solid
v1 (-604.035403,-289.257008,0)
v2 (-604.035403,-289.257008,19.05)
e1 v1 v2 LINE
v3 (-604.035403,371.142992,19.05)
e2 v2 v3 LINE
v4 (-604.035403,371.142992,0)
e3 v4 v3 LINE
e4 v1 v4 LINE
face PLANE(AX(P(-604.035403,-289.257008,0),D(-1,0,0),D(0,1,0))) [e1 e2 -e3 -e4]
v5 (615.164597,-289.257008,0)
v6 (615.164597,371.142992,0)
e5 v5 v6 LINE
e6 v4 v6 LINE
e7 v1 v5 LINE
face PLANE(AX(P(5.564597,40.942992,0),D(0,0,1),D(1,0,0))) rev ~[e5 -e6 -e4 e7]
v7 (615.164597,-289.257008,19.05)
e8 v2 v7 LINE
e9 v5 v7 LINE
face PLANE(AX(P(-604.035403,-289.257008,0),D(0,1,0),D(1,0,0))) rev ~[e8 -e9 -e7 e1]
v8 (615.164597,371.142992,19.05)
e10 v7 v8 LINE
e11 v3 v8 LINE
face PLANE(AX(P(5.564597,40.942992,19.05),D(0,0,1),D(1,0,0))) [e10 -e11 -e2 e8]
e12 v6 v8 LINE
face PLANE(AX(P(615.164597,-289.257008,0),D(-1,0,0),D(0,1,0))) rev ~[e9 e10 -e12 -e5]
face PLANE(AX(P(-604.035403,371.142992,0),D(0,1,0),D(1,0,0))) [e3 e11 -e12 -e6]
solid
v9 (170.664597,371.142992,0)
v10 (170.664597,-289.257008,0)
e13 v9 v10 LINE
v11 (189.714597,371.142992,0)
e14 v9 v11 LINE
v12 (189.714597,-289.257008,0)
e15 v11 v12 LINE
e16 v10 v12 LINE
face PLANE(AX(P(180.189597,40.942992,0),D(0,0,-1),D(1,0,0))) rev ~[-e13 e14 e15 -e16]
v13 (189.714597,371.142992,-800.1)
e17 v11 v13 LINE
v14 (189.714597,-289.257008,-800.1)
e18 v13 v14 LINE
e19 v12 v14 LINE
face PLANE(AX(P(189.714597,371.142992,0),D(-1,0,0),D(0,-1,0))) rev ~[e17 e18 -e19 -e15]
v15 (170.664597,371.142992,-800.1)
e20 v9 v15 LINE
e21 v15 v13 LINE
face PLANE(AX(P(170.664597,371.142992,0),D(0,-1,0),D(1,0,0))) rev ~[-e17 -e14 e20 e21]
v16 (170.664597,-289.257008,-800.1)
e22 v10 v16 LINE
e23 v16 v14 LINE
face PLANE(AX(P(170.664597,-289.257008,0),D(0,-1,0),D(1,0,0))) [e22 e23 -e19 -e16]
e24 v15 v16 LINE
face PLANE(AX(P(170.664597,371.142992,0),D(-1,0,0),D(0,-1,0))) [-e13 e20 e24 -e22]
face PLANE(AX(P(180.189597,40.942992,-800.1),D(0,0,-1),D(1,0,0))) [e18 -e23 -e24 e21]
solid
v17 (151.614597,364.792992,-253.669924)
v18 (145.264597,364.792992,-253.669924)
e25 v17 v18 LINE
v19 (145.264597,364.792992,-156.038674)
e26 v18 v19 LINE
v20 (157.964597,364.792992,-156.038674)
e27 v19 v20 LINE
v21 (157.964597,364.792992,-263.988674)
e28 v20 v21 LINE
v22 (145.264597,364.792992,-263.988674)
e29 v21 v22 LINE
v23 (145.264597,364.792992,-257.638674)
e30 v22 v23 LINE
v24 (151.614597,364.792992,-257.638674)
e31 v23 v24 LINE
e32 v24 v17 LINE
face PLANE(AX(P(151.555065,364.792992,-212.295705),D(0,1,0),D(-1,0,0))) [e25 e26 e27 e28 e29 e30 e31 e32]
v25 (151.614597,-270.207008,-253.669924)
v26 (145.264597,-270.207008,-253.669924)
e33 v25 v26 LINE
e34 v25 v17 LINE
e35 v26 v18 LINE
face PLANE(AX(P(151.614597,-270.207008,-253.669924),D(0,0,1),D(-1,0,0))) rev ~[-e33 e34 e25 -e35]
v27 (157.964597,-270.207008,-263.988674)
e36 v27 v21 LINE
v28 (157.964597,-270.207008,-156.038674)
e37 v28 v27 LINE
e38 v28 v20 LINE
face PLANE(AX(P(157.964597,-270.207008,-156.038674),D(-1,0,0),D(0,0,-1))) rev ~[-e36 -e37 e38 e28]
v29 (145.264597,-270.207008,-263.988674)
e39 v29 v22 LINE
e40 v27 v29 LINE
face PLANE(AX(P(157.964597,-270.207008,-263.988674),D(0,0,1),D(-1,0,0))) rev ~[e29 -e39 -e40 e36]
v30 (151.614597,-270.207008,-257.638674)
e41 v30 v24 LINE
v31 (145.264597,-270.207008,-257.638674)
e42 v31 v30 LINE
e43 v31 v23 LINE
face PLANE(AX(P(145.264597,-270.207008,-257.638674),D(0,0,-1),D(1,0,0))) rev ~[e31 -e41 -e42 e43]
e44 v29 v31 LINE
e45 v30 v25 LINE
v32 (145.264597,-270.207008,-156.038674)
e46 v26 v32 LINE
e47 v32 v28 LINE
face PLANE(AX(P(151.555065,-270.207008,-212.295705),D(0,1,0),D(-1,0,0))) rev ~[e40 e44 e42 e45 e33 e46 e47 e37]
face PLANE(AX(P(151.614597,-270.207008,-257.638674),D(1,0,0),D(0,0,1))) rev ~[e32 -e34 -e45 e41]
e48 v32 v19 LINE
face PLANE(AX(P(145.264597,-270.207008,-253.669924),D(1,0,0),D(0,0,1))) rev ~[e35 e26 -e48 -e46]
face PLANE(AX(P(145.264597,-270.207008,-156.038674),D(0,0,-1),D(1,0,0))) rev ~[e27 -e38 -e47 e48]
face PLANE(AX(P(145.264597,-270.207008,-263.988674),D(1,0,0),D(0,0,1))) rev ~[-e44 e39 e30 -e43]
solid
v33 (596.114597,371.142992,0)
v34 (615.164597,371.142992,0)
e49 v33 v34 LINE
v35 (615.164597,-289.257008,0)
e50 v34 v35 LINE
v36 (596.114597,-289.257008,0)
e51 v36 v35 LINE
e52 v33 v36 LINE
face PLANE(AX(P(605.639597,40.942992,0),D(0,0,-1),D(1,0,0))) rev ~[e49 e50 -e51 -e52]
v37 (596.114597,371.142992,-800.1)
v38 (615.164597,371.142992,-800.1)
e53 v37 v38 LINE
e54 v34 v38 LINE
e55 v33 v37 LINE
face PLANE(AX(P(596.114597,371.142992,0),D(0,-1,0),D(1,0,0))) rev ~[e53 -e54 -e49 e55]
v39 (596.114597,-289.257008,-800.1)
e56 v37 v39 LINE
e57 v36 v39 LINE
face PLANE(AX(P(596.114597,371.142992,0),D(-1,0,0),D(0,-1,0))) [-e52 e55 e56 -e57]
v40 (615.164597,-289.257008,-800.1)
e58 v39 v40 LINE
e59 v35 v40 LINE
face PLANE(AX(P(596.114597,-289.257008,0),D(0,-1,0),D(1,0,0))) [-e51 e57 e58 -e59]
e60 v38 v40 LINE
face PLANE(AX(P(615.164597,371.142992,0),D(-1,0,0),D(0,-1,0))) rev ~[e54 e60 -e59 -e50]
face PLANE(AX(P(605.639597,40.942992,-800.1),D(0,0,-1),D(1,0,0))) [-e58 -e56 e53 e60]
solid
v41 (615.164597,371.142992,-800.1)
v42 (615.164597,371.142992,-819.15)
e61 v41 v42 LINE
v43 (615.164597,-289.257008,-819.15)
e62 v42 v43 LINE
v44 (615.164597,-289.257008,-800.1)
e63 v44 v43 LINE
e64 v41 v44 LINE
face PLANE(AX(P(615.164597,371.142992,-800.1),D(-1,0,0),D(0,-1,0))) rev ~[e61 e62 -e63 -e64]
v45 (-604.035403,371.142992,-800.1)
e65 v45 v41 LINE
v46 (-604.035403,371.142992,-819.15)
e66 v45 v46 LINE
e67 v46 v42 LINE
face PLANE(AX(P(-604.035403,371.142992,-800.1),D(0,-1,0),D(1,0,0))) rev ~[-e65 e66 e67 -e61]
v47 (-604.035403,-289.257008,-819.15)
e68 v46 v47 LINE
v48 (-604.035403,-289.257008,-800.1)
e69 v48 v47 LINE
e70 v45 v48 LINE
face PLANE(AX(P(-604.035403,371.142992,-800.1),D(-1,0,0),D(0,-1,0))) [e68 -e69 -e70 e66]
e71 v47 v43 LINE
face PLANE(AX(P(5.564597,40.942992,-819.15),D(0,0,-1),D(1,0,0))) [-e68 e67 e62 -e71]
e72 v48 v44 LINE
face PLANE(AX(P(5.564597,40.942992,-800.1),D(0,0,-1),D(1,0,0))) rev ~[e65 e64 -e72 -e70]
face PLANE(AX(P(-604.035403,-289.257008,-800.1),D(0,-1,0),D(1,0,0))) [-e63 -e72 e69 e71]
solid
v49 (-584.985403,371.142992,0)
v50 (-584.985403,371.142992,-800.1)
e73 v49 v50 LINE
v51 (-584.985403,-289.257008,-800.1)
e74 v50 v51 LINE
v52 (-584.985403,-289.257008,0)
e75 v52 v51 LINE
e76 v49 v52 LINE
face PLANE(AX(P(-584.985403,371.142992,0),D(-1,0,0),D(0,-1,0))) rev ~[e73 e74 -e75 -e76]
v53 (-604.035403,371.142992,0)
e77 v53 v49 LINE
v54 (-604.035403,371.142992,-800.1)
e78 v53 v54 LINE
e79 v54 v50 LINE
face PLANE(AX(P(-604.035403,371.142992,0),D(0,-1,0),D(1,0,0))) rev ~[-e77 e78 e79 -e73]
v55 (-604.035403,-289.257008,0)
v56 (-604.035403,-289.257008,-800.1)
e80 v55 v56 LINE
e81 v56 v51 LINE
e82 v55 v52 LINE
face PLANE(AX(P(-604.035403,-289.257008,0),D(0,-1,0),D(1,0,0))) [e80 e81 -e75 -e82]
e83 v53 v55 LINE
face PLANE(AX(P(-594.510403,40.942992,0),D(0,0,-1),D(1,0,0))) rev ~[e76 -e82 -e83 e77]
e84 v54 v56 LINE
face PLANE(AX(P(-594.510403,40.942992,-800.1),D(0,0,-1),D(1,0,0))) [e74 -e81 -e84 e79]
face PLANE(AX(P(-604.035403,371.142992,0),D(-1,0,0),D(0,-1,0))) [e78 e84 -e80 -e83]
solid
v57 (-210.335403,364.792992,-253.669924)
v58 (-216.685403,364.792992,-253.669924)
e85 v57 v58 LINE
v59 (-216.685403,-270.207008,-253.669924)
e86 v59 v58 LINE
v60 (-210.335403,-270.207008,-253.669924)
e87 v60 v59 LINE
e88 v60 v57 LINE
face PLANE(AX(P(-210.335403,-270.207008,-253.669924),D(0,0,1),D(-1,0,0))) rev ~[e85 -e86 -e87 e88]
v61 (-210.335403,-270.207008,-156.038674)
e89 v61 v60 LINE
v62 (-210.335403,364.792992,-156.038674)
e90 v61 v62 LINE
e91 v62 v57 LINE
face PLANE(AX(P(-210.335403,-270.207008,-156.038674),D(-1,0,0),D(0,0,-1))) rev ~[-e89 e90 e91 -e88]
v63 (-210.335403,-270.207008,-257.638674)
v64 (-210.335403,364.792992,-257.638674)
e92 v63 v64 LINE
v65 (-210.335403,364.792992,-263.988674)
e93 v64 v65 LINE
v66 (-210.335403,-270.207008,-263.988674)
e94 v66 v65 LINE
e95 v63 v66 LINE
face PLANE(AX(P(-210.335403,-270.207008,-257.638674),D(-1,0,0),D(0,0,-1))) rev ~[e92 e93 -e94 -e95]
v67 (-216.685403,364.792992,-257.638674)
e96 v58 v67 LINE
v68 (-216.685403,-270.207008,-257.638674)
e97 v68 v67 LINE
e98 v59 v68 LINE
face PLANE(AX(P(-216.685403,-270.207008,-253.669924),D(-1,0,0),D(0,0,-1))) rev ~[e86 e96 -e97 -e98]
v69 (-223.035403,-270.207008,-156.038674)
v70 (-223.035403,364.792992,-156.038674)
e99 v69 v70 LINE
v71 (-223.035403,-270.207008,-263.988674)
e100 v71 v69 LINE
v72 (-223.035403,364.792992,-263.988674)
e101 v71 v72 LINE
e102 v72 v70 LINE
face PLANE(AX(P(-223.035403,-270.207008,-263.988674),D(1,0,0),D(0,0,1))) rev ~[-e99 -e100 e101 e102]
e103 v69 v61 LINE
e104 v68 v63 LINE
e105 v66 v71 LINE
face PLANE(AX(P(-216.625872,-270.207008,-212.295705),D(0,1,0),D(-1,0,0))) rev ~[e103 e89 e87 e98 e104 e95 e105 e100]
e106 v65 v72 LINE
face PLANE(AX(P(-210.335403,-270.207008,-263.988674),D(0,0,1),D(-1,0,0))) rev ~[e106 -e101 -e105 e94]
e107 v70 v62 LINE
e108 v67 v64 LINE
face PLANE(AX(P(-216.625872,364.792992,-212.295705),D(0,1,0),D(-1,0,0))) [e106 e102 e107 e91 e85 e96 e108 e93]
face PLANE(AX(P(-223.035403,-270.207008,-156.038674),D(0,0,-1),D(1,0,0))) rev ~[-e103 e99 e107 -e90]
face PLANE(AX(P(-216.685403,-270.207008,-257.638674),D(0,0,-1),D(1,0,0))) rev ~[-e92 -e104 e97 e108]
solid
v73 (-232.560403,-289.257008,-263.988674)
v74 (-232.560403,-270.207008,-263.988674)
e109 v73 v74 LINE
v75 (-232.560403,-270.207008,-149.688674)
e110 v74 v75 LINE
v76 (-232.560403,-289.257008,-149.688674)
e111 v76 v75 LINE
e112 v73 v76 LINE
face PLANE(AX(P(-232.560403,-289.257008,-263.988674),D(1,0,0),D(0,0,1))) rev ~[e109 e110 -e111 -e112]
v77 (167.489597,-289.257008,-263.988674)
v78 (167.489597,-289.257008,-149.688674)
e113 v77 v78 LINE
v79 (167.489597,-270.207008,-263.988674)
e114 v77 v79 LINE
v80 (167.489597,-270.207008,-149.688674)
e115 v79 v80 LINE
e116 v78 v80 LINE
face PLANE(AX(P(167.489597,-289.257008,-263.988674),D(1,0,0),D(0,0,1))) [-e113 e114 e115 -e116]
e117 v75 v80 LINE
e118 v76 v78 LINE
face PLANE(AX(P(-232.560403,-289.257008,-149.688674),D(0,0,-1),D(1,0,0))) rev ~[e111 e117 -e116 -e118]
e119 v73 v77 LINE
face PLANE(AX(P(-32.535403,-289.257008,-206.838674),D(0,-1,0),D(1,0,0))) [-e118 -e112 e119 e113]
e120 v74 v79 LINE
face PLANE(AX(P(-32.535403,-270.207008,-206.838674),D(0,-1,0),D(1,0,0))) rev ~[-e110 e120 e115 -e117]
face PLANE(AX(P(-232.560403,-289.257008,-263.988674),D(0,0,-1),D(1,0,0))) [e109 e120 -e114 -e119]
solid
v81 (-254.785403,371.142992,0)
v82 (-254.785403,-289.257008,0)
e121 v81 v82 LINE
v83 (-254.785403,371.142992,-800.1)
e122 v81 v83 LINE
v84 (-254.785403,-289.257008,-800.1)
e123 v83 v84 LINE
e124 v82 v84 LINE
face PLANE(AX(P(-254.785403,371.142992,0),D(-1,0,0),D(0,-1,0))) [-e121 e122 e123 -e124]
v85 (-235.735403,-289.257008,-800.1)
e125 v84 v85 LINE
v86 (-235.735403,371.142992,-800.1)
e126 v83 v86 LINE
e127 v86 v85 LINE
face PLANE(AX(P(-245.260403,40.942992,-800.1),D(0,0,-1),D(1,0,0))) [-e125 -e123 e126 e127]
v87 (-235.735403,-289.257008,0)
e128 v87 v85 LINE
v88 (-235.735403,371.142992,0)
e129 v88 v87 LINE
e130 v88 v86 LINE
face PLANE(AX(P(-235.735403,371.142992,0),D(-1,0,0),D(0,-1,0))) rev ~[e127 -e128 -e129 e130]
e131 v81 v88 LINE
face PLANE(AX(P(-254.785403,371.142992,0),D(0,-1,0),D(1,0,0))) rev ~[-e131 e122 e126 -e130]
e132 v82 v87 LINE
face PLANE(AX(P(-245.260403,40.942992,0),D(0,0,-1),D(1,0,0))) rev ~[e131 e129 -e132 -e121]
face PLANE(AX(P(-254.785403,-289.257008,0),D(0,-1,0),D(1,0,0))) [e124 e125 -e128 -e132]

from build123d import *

# Parameters (mm, degrees)
F0_W     = 1219.2
F0_H     = 660.4
F1_DEPTH = 19.05
F2_W     = 19.05
F2_H     = 660.4
F3_DEPTH = 800.1
F4_W     = 1219.2
F4_H     = 660.4
F5_DEPTH = 19.05
F6_W     = 400.05
F6_H     = 114.3
F7_DEPTH = 19.05
F9_DEPTH = 635


# Not quite as in the source:
# - a length typed as a fraction of an inch, garbled in the dataset ("3 / 203.2 mm" for 3/8 in), is restored


with BuildPart() as f1:
    # F0 (on Top) → F1 (new body)
    with BuildSketch(Plane.XY):
        with Locations((5.564596504, 40.9429918908)):
            Rectangle(F0_W, F0_H)
    extrude(amount=F1_DEPTH)


with BuildPart() as f3:
    # F2 (on face) → F3 (new body)
    with BuildSketch(Plane(origin=(0, 0, 0), x_dir=(1, 0, 0), z_dir=(0, 0, -1))):
        with Locations((-594.510403496, -40.9429918908)):
            Rectangle(F2_W, F2_H)
    extrude(amount=F3_DEPTH)


with BuildPart() as f3b:
    # F2 (on face) → F3, piece 2 (new body)
    with BuildSketch(Plane(origin=(0, 0, 0), x_dir=(1, 0, 0), z_dir=(0, 0, -1))):
        with Locations((605.639596504, -40.9429918908)):
            Rectangle(F2_W, F2_H)
    extrude(amount=F3_DEPTH)


with BuildPart() as f3c:
    # F2 (on face) → F3, piece 3 (new body)
    with BuildSketch(Plane(origin=(0, 0, 0), x_dir=(1, 0, 0), z_dir=(0, 0, -1))):
        with Locations((180.189596504, -40.9429918908)):
            Rectangle(F2_W, F2_H)
    extrude(amount=F3_DEPTH)


with BuildPart() as f3d:
    # F2 (on face) → F3, piece 4 (new body)
    with BuildSketch(Plane(origin=(0, 0, 0), x_dir=(1, 0, 0), z_dir=(0, 0, -1))):
        with Locations((-245.260403496, -40.9429918908)):
            Rectangle(F2_W, F2_H)
    extrude(amount=F3_DEPTH)


with BuildPart() as f5:
    # F4 (on face) → F5 (new body)
    with BuildSketch(Plane(origin=(0, 0, -800.1), x_dir=(1, 0, 0), z_dir=(0, 0, -1))):
        with Locations((5.564596504, -40.9429918908)):
            Rectangle(F4_W, F4_H)
    extrude(amount=F5_DEPTH)


with BuildPart() as f7:
    # F6 (on face) → F7 (new body)
    with BuildSketch(Plane.XZ.offset(289.2570081092)):
        with Locations((-32.535403496, -206.838673687)):
            Rectangle(F6_W, F6_H)
    extrude(amount=-F7_DEPTH)


with BuildPart() as f9:
    # F8 (on face) → F9 (new body)
    with BuildSketch(Plane(origin=(0, -270.2070081092, 0), x_dir=(-1, 0, 0), z_dir=(0, 1, 0))):
        Polygon((-145.264596504, -156.038673687), (-157.964596504, -156.038673687), (-157.964596504, -263.988673687), (-145.264596504, -263.988673687), (-145.264596504, -257.638673687), (-151.614596504, -257.638673687), (-151.614596504, -253.669923687), (-145.264596504, -253.669923687), align=None)
    extrude(amount=F9_DEPTH)


with BuildPart() as f9b:
    # F8 (on face) → F9, piece 2 (new body)
    with BuildSketch(Plane(origin=(0, -270.2070081092, 0), x_dir=(-1, 0, 0), z_dir=(0, 1, 0))):
        Polygon((216.685403496, -253.669923687), (216.685403496, -257.638673687), (210.335403496, -257.638673687), (210.335403496, -263.988673687), (223.035403496, -263.988673687), (223.035403496, -156.038673687), (210.335403496, -156.038673687), (210.335403496, -253.669923687), align=None)
    extrude(amount=F9_DEPTH)


solid = Compound([f1.part, f3.part, f3b.part, f3c.part, f3d.part, f5.part, f7.part, f9.part, f9b.part])
